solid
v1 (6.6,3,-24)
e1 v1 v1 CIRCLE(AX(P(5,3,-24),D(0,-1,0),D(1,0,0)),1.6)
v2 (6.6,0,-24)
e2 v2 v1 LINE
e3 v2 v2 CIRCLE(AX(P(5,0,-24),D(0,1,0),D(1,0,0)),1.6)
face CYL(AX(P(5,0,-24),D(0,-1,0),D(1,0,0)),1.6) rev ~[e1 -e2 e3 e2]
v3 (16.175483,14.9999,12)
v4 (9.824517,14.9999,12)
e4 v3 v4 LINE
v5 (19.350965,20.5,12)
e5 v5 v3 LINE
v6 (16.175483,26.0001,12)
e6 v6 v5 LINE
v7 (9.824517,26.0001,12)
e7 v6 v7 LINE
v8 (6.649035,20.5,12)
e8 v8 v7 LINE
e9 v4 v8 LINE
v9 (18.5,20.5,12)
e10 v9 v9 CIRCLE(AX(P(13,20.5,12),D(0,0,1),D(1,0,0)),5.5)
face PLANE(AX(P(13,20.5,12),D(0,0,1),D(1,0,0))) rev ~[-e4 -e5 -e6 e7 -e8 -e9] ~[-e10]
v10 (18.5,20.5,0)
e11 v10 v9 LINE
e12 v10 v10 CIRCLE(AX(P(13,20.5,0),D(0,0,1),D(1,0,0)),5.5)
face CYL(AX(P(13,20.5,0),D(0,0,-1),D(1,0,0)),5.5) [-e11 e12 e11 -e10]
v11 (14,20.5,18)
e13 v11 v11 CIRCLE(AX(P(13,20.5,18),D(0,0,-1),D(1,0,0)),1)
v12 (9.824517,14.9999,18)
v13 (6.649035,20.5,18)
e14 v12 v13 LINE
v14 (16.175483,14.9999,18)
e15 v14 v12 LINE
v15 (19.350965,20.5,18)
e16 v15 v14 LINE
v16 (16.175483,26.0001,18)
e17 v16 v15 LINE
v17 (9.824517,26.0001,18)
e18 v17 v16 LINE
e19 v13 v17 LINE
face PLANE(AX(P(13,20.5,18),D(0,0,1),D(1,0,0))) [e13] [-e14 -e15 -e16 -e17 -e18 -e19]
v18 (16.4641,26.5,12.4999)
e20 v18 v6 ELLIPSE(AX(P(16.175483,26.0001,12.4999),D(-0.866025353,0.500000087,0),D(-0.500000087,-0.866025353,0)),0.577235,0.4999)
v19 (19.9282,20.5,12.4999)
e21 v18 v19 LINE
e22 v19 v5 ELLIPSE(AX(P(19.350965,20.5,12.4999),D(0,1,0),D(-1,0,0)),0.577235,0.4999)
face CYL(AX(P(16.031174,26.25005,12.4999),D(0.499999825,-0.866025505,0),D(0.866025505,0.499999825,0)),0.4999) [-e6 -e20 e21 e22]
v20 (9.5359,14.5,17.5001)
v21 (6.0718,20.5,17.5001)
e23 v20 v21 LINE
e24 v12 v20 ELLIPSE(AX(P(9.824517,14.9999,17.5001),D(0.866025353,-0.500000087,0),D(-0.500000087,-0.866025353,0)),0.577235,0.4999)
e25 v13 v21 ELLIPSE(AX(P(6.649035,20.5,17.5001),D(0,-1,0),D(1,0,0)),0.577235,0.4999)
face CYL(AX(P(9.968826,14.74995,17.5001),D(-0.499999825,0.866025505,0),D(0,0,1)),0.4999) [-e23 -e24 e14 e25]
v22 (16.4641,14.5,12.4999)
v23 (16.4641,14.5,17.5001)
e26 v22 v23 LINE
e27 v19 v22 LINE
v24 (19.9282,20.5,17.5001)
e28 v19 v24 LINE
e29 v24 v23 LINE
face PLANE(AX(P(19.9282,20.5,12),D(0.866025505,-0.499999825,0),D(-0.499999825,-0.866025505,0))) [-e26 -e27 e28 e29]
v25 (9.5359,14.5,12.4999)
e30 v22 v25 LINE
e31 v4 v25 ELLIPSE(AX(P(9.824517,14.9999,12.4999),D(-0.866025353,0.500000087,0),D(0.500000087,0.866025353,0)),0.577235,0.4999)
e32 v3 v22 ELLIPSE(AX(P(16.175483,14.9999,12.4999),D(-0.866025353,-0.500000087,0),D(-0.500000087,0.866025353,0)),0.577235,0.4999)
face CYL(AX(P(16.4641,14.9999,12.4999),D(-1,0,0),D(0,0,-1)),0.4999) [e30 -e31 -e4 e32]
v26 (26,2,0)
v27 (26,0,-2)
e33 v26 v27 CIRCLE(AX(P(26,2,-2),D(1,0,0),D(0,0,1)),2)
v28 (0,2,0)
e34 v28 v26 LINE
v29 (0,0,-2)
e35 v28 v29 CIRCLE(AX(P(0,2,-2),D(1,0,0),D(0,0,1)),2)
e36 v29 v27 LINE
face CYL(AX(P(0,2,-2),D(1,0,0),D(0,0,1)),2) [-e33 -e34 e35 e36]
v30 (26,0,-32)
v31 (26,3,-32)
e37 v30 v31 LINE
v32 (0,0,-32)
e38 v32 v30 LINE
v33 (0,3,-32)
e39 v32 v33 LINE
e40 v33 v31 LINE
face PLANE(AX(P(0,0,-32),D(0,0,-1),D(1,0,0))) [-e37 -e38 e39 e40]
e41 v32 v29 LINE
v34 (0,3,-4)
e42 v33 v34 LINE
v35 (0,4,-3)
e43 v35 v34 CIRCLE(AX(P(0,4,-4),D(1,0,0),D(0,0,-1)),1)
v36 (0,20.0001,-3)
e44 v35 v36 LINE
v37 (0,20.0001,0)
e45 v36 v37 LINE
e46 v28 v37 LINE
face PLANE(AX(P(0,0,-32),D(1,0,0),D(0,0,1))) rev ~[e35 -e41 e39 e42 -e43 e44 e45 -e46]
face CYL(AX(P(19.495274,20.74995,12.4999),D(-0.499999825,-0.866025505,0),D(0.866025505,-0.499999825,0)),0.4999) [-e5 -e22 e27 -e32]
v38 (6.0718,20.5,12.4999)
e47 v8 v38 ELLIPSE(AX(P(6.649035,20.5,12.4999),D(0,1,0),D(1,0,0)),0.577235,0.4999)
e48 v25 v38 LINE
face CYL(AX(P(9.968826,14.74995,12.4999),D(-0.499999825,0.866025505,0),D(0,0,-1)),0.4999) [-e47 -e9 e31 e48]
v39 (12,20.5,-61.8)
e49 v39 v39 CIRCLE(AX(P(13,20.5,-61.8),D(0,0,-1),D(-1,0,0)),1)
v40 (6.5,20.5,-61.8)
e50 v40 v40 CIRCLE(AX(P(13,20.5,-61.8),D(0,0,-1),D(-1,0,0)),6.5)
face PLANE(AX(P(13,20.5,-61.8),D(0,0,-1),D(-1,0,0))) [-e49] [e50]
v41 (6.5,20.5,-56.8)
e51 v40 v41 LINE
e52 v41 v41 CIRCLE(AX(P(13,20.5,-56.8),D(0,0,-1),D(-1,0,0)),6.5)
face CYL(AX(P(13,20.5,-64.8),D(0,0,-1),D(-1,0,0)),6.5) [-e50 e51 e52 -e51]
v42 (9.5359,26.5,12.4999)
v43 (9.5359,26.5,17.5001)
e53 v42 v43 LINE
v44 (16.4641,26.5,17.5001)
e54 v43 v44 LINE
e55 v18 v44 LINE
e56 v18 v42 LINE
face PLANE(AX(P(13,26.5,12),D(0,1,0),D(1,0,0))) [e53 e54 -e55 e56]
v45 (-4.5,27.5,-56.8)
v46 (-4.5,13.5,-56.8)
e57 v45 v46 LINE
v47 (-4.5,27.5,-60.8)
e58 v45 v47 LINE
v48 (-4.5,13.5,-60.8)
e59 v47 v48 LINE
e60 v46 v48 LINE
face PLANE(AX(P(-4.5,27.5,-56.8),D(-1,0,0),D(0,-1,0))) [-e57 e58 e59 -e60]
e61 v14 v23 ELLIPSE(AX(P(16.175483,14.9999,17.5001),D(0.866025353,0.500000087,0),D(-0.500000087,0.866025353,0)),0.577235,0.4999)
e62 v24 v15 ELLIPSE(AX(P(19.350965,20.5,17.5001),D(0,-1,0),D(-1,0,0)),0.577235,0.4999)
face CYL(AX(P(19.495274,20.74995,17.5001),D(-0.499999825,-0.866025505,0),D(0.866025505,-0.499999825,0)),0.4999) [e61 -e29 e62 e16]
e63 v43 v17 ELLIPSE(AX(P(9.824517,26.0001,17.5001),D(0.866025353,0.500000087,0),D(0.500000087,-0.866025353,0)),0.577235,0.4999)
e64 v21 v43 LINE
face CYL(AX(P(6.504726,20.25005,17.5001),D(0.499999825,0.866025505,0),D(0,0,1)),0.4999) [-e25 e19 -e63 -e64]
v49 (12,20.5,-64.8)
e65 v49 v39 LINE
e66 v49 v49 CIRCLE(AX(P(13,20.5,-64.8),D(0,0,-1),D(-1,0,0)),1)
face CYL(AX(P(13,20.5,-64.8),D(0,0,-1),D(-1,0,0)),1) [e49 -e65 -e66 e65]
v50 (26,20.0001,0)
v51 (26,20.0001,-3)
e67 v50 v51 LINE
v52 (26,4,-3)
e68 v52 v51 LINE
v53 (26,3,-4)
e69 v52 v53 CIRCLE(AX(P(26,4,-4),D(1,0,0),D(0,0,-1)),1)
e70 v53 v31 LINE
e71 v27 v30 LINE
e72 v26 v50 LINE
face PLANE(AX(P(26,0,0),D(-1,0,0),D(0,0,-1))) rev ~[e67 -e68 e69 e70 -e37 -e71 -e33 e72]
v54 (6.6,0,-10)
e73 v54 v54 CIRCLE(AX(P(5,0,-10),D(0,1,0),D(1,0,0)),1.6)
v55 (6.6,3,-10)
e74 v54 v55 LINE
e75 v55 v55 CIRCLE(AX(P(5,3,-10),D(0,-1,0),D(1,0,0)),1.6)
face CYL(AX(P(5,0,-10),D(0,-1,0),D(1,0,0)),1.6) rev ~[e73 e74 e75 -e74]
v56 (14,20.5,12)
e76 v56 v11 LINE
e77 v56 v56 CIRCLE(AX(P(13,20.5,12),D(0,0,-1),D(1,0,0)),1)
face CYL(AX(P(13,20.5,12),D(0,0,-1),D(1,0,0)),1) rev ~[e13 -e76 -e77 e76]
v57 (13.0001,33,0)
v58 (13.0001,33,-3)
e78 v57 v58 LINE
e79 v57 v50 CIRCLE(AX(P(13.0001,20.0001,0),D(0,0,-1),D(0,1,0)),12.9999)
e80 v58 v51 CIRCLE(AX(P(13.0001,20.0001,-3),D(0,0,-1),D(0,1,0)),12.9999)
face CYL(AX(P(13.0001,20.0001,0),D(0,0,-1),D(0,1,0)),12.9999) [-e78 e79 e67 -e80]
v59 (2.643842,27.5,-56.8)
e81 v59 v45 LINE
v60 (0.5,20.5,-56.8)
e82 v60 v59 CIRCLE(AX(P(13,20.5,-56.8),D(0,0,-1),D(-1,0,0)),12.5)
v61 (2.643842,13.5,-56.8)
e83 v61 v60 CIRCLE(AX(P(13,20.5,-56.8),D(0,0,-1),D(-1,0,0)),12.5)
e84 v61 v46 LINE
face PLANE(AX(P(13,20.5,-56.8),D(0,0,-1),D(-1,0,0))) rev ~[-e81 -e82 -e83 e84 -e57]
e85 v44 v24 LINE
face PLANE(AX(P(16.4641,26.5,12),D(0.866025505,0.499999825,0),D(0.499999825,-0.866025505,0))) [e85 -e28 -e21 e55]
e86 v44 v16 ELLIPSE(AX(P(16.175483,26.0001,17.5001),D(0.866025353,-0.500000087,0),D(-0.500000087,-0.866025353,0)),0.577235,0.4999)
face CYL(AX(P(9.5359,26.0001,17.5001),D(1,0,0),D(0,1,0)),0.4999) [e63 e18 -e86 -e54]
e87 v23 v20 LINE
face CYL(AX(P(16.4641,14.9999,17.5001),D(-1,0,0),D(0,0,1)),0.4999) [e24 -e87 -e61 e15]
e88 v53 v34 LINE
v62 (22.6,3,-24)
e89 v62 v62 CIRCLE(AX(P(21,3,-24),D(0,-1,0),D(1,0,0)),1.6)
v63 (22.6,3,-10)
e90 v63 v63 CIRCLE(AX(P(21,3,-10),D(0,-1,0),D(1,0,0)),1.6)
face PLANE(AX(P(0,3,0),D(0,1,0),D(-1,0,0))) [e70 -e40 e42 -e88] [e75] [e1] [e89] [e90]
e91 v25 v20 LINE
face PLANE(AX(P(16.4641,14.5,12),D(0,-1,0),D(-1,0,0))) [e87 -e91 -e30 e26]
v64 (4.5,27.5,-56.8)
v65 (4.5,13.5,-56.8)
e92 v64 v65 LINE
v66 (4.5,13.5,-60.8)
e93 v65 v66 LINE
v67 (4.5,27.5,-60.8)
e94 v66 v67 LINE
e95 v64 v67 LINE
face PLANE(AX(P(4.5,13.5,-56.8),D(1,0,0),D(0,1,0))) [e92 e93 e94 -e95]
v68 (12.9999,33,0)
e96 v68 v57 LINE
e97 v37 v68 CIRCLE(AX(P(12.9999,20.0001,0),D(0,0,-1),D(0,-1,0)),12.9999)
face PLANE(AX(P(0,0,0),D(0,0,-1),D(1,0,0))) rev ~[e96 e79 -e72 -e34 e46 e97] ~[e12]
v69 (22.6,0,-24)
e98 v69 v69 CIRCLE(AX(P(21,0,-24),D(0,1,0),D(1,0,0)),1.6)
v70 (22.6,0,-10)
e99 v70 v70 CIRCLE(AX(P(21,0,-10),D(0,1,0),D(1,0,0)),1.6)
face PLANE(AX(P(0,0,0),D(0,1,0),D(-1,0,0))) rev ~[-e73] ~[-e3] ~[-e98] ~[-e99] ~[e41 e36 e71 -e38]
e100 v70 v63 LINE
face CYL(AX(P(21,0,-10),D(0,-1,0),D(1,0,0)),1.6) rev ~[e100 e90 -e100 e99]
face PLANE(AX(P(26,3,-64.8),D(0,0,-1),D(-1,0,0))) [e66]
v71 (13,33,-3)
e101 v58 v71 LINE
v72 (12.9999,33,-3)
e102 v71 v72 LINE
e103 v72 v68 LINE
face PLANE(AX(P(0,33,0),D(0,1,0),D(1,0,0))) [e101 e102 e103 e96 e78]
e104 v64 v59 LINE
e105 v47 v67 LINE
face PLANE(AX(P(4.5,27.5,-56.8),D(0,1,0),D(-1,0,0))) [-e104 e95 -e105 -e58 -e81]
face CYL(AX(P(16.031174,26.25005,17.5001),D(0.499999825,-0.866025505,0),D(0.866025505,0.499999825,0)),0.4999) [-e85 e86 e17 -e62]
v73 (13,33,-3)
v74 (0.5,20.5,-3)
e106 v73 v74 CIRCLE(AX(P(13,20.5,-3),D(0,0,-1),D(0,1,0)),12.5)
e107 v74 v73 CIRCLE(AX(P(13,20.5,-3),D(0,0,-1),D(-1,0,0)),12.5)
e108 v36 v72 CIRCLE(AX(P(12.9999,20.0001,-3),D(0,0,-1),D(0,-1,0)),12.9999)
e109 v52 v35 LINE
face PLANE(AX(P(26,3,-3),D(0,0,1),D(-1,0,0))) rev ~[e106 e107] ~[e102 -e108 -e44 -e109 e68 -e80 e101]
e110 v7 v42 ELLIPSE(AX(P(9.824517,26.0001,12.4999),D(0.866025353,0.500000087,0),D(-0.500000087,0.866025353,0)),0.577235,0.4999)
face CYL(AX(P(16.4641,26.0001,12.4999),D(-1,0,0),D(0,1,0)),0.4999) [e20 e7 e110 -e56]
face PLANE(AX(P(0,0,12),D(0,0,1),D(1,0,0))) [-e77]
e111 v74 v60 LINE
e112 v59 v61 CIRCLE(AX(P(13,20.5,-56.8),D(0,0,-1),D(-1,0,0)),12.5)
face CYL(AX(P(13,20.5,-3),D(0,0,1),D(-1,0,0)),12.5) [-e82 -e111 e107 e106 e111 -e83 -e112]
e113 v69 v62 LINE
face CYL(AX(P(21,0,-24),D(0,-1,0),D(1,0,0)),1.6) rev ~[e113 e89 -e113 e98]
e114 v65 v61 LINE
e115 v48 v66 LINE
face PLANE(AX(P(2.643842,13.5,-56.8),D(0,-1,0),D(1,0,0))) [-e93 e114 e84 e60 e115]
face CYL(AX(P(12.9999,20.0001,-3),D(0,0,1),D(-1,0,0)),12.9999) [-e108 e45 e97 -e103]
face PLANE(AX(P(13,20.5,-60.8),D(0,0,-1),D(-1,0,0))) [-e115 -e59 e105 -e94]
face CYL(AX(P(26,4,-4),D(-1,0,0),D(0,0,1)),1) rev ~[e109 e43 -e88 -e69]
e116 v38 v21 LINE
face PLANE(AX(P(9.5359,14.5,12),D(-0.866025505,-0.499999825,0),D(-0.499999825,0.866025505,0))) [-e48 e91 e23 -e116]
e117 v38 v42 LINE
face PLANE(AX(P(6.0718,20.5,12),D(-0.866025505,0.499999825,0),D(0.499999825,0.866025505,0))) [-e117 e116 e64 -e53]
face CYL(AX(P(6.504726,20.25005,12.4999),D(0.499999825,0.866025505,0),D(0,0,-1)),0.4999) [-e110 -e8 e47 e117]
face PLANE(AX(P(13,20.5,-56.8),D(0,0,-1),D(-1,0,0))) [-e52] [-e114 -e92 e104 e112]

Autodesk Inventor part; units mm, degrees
ref_plane "YZ Plane" through (0, 0, 0) normal (1, 0, 0) x (0, 1, 0)
ref_plane "XZ Plane" through (0, 0, 0) normal (0, 1, 0) x (-1, 0, 0)
ref_plane "XY Plane" through (0, 0, 0) normal (0, 0, 1) x (1, 0, 0)
sketch "Эскиз1" plane through (0, 0, 0) normal (0, 1, 0) x (-1, 0, 0)
  line L0 (0, 0) -> (-26, 0)
  line L1 (0, -32) -> (-26, -32)
  line L2 (-26, -32) -> (0, -32)
  line L3 (0, -32) -> (0, 0)
  line L4 (0, 0) -> (-26, 0)
  line L5 (-26, 0) -> (-26, -32)
extrude "Выдавливание1" add sketch "Эскиз1" along normal blind 3
sketch "Эскиз2" plane through (0, 3, 0) normal (0, 1, 0) x (1, 0, 0)
  line L0 (0, 0) -> (26, 0) projected
  line L1 (26, 0) -> (26, 33) projected
  line L2 (0, 0) -> (26, 0)
  line L3 (26, 0) -> (26, 3)
  line L4 (26, 3) -> (0, 3)
  line L5 (0, 3) -> (0, 0)
  dimension "d4" = 3
extrude "Выдавливание2" add sketch "Эскиз2" along normal blind 30
sketch "Эскиз3" plane through (26, 3, -3) normal (0, 0, -1) x (-1, 0, 0)
  line L0 (0, 0) -> (26, 0) projected
  line L1 (13, 0) -> (13, 5)
  line L2 (13, 5) -> (13, 17.5)
  circle A0 centre (13, 17.5) radius 12.5
  point P0 (26, -3)
  dimension "d7" = 5
  dimension "d8" = 12.5
extrude "Выдавливание3" add sketch "Эскиз3" along normal blind 61.8
sketch "Эскиз4" plane through (13, 20.5, -64.8) normal (0, 0, -1) x (-1, 0, 0)
  circle A0 centre (0, 0) radius 6.5
  circle A1 centre (0, 0) radius 12.5
  point P0 (13, -20.5)
  dimension "d11" = 13
extrude "Выдавливание4" cut sketch "Эскиз4" against normal blind 8
sketch "Эскиз5" plane through (13, 20.5, -64.8) normal (0, 0, -1) x (-1, 0, 0)
  circle A0 centre (0, 0) radius 1
  circle A1 centre (0, 0) radius 6.5
  point P0 (13, -20.5)
  dimension "d14" = 2
extrude "Выдавливание5" cut sketch "Эскиз5" against normal blind 3
sketch "Эскиз6" plane through (13, 20.5, -56.8) normal (0, 0, -1) x (-1, 0, 0)
  circle A0 centre (0, 0) radius 12.5 projected
  line L0 (-12.5, 0) -> (8.5, 0)
  line L1 (8.5, 0) -> (8.5, 7)
  line L2 (8.5, 7) -> (17.5, 7)
  line L3 (17.5, 7) -> (17.5, -7)
  line L4 (17.5, -7) -> (8.5, -7)
  line L5 (8.5, -7) -> (8.5, 0)
  point P0 (13, -20.5)
  dimension "d17" = 21
  dimension "d18" = 7
  dimension "d19" = 9
  dimension "d20" = 14
extrude "Выдавливание6" add sketch "Эскиз6" along normal blind 4 contours A0 L4 L5 L1 L2 | A0 L2 L3 L4
sketch "Эскиз7" plane through (0, 0, 0) normal (0, 0, 1) x (1, 0, 0)
  circle A0 centre (13, 20.5) radius 1 projected
  circle A1 centre (13, 20.5) radius 5.5
  point P0 (0, 0)
  dimension "d23" = 11
extrude "Выдавливание7" add sketch "Эскиз7" along normal blind 12 contours A0 | A1
sketch "Эскиз8" plane through (13, 20.5, 12) normal (0, 0, 1) x (1, 0, 0)
  line L0 (0, 0) -> (0, 6)
  circle A0 centre (0, 0) radius 1 projected
  line L1 (3.4641, 6) -> (6.9282, 0)
  line L2 (6.9282, 0) -> (3.4641, -6)
  line L3 (3.4641, -6) -> (-3.4641, -6)
  line L4 (-3.4641, -6) -> (-6.9282, 0)
  line L5 (-6.9282, 0) -> (-3.4641, 6)
  line L6 (-3.4641, 6) -> (3.4641, 6)
  point P0 (-13, -20.5)
  dimension "d26" = 6
extrude "Выдавливание8" add sketch "Эскиз8" along normal blind 6
fillet "Сопряжение1" radius 0.5 12 edges at (7.8038, 23.5, 12) (13, 26.5, 12) (7.8038, 17.5, 12) (13, 14.5, 12) (18.1962, 17.5, 12) (18.1962, 23.5, 12) (13, 14.5, 18) (18.1962, 17.5, 18) (18.1962, 23.5, 18) (13, 26.5, 18) (7.8038, 23.5, 18) (7.8038, 17.5, 18)
sketch "Эскиз9" plane through (0, 0, 0) normal (0, -1, 0) x (1, 0, 0)
  line L0 (26, 0) -> (26, -33) projected
  line L1 (0, 0) -> (26, 0) projected
  line L2 (5, -10) -> (21, -10)
  line L3 (21, -10) -> (21, -24)
  line L4 (21, -24) -> (5, -24)
  line L5 (5, -24) -> (5, -10)
  circle A0 centre (5, -10) radius 1.6
  circle A1 centre (21, -10) radius 1.6
  circle A2 centre (21, -24) radius 1.6
  circle A3 centre (5, -24) radius 1.6
  dimension "d45" = 16
  dimension "d46" = 14
  dimension "d47" = 3.2
  dimension "d48" = 3.2
  dimension "d49" = 3.2
  dimension "d50" = 3.2
extrude "Выдавливание9" cut sketch "Эскиз9" against normal blind 3 contours L5 A0 L2 | L2 A0 L5 | A1 L3 L2 | L2 L3 A1 | A3 L4 L5 | L5 L4 A3 | A2 L4 L3 | L3 L4 A2
fillet "Сопряжение2" radius 2 1 edges at (13, 0, 0)
fillet "Сопряжение3" radius 1 1 edges at (13, 3, -3)
fillet "Сопряжение4" radius 13 2 edges at (0, 33, -1.5) (26, 33, -1.5)
properties part number "motor"
